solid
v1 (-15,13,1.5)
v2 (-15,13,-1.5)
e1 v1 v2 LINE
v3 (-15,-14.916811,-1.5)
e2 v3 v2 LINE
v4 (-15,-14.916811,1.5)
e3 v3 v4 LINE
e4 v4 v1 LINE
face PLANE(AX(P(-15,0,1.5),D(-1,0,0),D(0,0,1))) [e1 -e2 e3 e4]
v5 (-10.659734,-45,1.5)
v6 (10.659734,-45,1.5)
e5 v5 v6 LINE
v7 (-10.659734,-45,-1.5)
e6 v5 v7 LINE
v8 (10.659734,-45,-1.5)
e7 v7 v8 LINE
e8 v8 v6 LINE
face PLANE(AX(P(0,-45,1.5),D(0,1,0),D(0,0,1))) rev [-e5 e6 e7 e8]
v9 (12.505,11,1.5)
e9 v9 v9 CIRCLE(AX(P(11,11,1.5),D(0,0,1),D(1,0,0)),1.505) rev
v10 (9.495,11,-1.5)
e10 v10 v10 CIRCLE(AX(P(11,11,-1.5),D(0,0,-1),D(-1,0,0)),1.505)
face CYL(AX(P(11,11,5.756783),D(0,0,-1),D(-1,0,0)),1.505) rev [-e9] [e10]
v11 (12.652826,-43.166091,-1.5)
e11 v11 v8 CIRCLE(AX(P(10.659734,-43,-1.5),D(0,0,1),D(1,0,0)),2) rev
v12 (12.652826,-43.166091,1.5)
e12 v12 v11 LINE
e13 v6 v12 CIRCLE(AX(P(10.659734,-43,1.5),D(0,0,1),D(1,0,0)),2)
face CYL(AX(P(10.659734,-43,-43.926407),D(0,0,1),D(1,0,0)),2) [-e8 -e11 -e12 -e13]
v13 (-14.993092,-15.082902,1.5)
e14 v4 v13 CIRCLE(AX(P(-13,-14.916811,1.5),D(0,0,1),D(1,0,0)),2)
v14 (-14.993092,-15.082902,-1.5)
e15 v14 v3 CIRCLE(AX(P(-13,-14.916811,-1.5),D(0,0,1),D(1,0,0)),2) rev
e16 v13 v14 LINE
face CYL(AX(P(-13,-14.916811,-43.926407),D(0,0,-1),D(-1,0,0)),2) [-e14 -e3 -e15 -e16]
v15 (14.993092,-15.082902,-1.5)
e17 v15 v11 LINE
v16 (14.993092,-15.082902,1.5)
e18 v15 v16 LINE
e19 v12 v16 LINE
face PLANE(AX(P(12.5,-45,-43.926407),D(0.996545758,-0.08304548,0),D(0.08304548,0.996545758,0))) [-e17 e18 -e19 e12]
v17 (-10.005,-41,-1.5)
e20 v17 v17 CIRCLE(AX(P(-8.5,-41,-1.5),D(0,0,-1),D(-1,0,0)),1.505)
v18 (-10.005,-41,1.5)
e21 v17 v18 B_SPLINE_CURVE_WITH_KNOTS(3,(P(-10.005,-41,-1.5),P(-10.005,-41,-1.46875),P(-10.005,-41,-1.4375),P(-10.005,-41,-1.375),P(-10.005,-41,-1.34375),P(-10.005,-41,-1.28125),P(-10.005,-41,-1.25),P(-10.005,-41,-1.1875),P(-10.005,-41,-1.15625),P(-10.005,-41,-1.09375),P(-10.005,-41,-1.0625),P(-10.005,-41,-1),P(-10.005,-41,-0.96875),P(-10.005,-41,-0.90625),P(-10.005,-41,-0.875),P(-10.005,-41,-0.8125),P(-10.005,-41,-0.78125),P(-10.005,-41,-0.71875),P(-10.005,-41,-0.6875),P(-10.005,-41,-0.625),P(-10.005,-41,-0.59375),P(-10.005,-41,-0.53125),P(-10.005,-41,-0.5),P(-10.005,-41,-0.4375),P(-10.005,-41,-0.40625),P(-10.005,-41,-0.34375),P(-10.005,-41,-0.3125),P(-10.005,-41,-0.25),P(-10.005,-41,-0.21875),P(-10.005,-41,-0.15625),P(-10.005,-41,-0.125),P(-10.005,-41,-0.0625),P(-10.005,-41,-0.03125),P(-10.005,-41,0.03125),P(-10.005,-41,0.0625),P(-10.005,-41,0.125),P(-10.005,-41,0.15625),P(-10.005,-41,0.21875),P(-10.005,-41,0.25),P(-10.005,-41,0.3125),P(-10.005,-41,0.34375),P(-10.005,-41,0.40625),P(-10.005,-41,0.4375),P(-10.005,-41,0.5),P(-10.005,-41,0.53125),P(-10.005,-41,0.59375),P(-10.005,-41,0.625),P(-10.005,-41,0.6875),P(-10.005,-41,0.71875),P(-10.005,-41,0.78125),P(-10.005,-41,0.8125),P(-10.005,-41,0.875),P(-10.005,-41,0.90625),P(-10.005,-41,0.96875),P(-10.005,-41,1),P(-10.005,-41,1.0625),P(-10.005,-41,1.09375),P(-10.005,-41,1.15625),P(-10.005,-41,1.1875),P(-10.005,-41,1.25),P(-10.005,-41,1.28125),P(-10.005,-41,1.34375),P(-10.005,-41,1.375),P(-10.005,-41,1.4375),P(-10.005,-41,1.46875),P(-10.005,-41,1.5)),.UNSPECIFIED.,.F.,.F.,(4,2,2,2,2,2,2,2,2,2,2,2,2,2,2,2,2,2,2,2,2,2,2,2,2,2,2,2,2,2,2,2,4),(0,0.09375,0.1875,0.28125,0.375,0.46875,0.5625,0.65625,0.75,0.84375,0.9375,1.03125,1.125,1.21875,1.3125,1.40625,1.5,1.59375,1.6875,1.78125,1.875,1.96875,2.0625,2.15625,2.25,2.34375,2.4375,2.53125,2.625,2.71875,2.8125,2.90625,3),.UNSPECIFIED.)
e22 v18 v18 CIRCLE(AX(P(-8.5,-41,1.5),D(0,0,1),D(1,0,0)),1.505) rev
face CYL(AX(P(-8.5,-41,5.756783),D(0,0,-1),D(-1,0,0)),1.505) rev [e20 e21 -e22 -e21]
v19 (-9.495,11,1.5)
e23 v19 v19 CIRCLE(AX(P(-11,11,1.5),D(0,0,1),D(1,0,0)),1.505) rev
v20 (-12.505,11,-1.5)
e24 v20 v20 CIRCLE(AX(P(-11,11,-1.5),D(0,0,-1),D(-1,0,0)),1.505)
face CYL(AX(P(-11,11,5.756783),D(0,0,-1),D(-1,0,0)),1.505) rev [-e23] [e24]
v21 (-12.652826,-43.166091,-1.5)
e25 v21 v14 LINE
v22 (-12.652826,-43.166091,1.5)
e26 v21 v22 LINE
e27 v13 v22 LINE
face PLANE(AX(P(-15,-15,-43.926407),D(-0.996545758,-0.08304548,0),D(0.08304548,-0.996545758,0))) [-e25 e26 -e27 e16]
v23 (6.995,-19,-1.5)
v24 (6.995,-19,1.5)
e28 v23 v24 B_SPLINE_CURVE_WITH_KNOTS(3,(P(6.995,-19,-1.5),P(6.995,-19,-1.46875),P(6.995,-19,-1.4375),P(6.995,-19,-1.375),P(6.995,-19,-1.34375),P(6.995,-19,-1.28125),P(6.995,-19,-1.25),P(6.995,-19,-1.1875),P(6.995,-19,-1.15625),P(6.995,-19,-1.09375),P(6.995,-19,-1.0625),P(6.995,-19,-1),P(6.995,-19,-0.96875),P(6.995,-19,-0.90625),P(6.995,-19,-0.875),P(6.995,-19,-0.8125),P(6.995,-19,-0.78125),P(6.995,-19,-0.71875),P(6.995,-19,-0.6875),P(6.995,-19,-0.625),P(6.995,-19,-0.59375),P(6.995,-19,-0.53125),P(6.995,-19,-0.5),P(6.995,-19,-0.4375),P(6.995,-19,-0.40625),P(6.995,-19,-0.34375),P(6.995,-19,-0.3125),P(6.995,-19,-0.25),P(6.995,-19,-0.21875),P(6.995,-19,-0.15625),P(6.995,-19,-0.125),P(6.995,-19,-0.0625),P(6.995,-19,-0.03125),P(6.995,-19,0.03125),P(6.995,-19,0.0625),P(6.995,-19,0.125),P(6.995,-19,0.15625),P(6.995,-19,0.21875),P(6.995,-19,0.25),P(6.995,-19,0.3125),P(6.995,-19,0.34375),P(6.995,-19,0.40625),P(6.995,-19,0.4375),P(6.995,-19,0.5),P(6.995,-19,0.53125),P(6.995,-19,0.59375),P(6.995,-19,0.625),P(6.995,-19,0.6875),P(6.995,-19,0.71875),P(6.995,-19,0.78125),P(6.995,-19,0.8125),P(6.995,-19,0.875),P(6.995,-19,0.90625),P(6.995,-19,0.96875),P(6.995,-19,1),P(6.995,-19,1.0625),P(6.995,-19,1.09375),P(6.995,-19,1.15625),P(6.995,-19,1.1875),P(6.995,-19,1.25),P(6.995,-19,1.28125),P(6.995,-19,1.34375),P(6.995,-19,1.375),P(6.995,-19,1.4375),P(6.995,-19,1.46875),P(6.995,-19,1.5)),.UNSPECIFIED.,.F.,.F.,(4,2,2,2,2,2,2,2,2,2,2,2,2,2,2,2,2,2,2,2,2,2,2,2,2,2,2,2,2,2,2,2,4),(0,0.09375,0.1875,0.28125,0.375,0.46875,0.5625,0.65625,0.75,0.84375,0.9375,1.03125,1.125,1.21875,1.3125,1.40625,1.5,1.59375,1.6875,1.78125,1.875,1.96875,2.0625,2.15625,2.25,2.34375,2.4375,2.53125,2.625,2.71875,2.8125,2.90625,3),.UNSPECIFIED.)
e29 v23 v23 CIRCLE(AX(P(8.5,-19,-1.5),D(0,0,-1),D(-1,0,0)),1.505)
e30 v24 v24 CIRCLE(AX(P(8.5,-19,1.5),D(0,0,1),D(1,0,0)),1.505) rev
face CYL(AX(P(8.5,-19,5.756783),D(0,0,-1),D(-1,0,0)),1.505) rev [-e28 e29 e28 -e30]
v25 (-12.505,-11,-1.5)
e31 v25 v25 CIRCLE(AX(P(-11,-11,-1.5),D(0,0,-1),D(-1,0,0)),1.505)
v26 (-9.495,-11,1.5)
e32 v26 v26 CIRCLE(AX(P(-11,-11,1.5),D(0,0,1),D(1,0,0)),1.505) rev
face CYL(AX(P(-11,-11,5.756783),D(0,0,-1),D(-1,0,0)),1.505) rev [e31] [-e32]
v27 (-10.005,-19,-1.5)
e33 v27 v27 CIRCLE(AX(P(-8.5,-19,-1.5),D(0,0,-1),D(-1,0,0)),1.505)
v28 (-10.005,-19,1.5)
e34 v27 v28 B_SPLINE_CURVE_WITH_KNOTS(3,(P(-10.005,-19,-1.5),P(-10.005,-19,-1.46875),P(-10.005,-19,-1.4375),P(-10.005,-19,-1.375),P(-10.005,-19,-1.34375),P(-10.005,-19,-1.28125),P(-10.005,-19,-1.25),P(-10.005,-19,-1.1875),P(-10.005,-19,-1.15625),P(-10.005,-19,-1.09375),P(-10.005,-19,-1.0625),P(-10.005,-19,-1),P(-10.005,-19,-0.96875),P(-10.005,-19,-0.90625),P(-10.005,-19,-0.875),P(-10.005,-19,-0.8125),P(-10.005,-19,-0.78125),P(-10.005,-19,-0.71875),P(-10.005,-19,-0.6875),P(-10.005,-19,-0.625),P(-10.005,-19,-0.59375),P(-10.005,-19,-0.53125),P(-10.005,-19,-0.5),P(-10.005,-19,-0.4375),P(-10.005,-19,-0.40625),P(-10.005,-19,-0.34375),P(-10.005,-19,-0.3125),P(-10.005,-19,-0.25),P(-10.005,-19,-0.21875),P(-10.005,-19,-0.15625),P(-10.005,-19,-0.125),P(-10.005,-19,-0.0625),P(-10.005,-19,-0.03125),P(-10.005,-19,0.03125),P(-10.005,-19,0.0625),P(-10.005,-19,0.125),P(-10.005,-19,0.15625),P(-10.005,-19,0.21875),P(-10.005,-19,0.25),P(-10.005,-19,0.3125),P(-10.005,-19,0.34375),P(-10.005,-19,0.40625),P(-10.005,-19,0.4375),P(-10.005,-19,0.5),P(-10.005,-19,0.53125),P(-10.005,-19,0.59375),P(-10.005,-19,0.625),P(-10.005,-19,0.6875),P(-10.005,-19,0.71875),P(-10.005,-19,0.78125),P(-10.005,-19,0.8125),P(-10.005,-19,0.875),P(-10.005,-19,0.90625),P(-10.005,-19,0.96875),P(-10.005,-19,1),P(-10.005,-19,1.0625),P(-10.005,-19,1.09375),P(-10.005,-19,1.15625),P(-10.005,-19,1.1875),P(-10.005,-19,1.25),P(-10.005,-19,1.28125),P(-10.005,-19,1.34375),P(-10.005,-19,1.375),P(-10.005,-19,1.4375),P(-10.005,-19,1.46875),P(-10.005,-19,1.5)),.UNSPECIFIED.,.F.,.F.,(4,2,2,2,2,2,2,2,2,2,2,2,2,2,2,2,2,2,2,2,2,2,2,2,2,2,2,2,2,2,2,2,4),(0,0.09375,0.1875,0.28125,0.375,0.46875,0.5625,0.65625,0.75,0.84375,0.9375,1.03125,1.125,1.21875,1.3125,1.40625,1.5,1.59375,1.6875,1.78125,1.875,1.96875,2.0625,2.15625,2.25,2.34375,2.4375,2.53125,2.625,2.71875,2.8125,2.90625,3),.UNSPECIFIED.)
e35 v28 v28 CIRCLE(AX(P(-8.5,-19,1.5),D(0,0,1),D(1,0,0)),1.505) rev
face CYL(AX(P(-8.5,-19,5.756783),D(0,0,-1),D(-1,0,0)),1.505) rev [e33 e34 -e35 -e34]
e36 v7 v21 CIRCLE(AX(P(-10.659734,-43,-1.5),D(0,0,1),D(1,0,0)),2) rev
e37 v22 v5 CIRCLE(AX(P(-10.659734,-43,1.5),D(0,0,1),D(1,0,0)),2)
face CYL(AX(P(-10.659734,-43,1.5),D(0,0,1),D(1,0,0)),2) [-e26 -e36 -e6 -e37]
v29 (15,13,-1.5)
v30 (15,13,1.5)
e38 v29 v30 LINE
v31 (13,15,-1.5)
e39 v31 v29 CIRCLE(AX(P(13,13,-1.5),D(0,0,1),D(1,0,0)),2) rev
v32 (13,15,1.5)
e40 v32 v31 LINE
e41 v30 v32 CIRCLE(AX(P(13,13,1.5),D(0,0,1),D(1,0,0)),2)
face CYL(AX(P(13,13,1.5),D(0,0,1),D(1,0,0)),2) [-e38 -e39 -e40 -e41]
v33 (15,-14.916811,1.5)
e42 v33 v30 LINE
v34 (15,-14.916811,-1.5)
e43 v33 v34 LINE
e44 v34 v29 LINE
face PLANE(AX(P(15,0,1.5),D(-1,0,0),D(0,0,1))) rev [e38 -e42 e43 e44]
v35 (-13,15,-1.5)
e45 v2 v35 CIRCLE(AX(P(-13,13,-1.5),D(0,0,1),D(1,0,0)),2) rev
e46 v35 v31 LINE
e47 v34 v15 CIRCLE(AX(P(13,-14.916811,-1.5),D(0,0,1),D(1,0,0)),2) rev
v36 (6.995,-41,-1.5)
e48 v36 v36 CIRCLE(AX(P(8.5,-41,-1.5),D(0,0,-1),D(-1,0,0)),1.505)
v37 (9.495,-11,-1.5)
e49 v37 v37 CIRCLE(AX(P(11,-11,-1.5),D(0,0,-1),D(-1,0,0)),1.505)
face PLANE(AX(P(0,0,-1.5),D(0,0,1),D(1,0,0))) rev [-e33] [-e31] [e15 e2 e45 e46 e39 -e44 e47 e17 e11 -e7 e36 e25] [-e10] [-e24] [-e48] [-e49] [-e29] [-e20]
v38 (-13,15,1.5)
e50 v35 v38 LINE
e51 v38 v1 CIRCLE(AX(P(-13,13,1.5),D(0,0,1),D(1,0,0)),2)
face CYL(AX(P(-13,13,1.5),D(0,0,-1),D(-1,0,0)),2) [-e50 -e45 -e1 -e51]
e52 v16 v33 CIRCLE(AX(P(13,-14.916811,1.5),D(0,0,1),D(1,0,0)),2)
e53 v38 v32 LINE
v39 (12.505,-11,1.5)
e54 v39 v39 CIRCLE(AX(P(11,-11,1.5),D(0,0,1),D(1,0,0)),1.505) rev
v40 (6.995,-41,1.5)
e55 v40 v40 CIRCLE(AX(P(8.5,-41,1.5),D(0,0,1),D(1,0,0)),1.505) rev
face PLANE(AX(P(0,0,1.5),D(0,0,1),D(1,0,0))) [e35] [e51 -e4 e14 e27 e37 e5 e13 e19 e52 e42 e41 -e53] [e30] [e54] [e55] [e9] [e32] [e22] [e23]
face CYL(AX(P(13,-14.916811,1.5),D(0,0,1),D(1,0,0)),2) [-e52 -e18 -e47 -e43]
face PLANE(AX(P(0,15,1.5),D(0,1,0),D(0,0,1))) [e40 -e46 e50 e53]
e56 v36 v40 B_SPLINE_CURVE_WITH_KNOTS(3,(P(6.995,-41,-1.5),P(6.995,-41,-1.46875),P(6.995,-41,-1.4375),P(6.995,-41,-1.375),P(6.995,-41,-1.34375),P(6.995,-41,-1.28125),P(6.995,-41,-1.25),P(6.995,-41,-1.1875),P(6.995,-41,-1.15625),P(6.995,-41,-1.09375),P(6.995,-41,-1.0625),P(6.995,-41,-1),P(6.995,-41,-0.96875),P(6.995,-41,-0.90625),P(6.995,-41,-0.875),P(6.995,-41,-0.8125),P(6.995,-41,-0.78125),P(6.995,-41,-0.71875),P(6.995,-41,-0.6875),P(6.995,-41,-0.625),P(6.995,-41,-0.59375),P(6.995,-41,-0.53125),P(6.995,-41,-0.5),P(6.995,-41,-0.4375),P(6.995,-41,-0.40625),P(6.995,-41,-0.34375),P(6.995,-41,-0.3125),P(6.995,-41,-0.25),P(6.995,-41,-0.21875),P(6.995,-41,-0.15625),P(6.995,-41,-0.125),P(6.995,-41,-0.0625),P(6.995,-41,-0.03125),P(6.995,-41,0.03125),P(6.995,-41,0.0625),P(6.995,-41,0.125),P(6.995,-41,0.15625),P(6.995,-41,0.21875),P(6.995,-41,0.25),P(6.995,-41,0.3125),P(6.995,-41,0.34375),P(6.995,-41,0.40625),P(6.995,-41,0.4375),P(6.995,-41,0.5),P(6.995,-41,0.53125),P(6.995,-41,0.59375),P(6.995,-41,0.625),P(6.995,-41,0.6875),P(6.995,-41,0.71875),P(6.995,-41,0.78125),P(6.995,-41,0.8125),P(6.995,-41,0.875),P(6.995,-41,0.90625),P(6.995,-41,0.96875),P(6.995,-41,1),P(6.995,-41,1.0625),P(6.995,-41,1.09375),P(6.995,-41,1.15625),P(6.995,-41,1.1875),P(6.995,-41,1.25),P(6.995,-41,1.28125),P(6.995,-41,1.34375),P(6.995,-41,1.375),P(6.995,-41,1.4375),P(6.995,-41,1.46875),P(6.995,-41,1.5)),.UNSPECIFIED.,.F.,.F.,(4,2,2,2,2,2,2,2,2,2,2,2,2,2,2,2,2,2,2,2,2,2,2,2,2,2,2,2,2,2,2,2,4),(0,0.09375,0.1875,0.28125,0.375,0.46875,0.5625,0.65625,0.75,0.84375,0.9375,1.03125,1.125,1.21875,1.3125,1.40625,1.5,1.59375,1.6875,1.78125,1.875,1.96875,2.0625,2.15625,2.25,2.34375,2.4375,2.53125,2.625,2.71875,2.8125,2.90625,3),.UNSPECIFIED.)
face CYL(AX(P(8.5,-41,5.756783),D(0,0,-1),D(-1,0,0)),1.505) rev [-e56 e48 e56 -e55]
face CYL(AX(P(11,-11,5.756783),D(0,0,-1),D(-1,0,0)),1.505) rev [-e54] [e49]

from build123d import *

# Parameters (mm, degrees)
SKETCH_1_W          = 30
SKETCH_1_H          = 30
SKETCH_1_W_2        = 25
EXTRUDE_1_DEPTH     = 1.5
EXTRUDE_2_DEPTH     = 3
SKETCH_5_R          = 1.505
CUT_EXTRUDE_2_DEPTH = 3
SKETCH_3_R          = 1.505
CUT_EXTRUDE_1_DEPTH = 3
FILLET_1_R          = 2


with BuildPart() as part:
    # 草图1 → 凸台-拉伸1 (new, symmetric)
    with BuildSketch(Plane.XY):
        Rectangle(SKETCH_1_W, SKETCH_1_H)
        with Locations((0, -30)):
            Rectangle(SKETCH_1_W_2, SKETCH_1_H)
    extrude(amount=EXTRUDE_1_DEPTH, both=True)

    # 草图2 → 凸台-拉伸2 (add)
    with BuildSketch(Plane.XY.offset(1.5)):
        Polygon((-15, -15), (-12.5, -45), (12.5, -45), (15, -15), align=None)
    extrude(amount=-EXTRUDE_2_DEPTH)

    # 草图5 → 切除-拉伸2 (cut)
    with BuildSketch(Plane(origin=(0, 0, -1.5), x_dir=(-1, 0, 0), z_dir=(0, 0, -1))):
        with Locations((-8.5, -19)):
            Circle(SKETCH_5_R)
        with Locations((8.5, -19)):
            Circle(SKETCH_5_R)
        with Locations((-8.5, -41)):
            Circle(SKETCH_5_R)
        with Locations((8.5, -41)):
            Circle(SKETCH_5_R)
    extrude(amount=-CUT_EXTRUDE_2_DEPTH, mode=Mode.SUBTRACT)

    # 草图3 → 切除-拉伸1 (cut)
    with BuildSketch(Plane(origin=(0, 0, -1.5), x_dir=(-1, 0, 0), z_dir=(0, 0, -1))):
        with Locations((-11, 11)):
            Circle(SKETCH_3_R)
        with Locations((11, 11)):
            Circle(SKETCH_3_R)
        with Locations((-11, -11)):
            Circle(SKETCH_3_R)
        with Locations((11, -11)):
            Circle(SKETCH_3_R)
    extrude(amount=-CUT_EXTRUDE_1_DEPTH, mode=Mode.SUBTRACT)

    # 圆角1
    # the kernel refuses this fillet: 2 mm, written as the material it takes off along each edge
    with BuildSketch(Plane(origin=(-15, -15, 1.707972894), x_dir=(0, 1, 0), z_dir=(0, 0, -1)), Plane(origin=(15, -15, -1.707972894), x_dir=(0, 1, 0), z_dir=(0, 0, 1))) as fillet_1_piece_1:
        with BuildLine():
            CenterArc((FILLET_1_R * 0.0415945787923, FILLET_1_R), FILLET_1_R, 265.236358309, 4.763641691)
            Line((-FILLET_1_R * 0.0414509010614, FILLET_1_R * 0.00345424175512), (0, 0))
            Line((0, 0), (FILLET_1_R * 0.0415945787923, 0))
        make_face()
    extrude(amount=3.415945788, mode=Mode.SUBTRACT)
    with BuildSketch(Plane(origin=(-15, 15, 6.5), x_dir=(0, -1, 0), z_dir=(0, 0, -1))) as fillet_1_piece_2:
        with BuildLine():
            CenterArc((FILLET_1_R, -FILLET_1_R), FILLET_1_R, 90, 90)
            Line((0, -FILLET_1_R), (0, 0))
            Line((0, 0), (FILLET_1_R, 0))
        make_face()
    extrude(amount=13, mode=Mode.SUBTRACT)
    with BuildSketch(Plane(origin=(15, 15, -6.5), x_dir=(-1, 0, 0), z_dir=(0, 0, 1))) as fillet_1_piece_3:
        with BuildLine():
            CenterArc((FILLET_1_R, FILLET_1_R), FILLET_1_R, 180, 90)
            Line((0, FILLET_1_R), (0, 0))
            Line((0, 0), (FILLET_1_R, 0))
        make_face()
    extrude(amount=13, mode=Mode.SUBTRACT)
    with BuildSketch(Plane(origin=(12.5, -45, 6.100664408), x_dir=(-1, 0, 0), z_dir=(0, 0, -1))) as fillet_1_piece_4:
        with BuildLine():
            CenterArc((FILLET_1_R * 0.920132881566, FILLET_1_R), FILLET_1_R, 184.763641691, 85.236358309)
            Line((-FILLET_1_R * 0.0764128766789, FILLET_1_R * 0.916954520146), (0, 0))
            Line((0, 0), (FILLET_1_R * 0.920132881566, 0))
        make_face()
    extrude(amount=12.201328816, mode=Mode.SUBTRACT)
    with BuildSketch(Plane(origin=(-12.5, -45, -6.100664408), x_dir=(-0.08304547985374029, 0.9965457582448797, 0), z_dir=(0, 0, 1))) as fillet_1_piece_5:
        with BuildLine():
            CenterArc((FILLET_1_R * 0.920132881566, -FILLET_1_R), FILLET_1_R, 90, 85.236358309)
            Line((-FILLET_1_R * 0.0764128766789, -FILLET_1_R * 0.916954520146), (0, 0))
            Line((0, 0), (FILLET_1_R * 0.920132881566, 0))
        make_face()
    extrude(amount=12.201328816, mode=Mode.SUBTRACT)


solid = part.part
